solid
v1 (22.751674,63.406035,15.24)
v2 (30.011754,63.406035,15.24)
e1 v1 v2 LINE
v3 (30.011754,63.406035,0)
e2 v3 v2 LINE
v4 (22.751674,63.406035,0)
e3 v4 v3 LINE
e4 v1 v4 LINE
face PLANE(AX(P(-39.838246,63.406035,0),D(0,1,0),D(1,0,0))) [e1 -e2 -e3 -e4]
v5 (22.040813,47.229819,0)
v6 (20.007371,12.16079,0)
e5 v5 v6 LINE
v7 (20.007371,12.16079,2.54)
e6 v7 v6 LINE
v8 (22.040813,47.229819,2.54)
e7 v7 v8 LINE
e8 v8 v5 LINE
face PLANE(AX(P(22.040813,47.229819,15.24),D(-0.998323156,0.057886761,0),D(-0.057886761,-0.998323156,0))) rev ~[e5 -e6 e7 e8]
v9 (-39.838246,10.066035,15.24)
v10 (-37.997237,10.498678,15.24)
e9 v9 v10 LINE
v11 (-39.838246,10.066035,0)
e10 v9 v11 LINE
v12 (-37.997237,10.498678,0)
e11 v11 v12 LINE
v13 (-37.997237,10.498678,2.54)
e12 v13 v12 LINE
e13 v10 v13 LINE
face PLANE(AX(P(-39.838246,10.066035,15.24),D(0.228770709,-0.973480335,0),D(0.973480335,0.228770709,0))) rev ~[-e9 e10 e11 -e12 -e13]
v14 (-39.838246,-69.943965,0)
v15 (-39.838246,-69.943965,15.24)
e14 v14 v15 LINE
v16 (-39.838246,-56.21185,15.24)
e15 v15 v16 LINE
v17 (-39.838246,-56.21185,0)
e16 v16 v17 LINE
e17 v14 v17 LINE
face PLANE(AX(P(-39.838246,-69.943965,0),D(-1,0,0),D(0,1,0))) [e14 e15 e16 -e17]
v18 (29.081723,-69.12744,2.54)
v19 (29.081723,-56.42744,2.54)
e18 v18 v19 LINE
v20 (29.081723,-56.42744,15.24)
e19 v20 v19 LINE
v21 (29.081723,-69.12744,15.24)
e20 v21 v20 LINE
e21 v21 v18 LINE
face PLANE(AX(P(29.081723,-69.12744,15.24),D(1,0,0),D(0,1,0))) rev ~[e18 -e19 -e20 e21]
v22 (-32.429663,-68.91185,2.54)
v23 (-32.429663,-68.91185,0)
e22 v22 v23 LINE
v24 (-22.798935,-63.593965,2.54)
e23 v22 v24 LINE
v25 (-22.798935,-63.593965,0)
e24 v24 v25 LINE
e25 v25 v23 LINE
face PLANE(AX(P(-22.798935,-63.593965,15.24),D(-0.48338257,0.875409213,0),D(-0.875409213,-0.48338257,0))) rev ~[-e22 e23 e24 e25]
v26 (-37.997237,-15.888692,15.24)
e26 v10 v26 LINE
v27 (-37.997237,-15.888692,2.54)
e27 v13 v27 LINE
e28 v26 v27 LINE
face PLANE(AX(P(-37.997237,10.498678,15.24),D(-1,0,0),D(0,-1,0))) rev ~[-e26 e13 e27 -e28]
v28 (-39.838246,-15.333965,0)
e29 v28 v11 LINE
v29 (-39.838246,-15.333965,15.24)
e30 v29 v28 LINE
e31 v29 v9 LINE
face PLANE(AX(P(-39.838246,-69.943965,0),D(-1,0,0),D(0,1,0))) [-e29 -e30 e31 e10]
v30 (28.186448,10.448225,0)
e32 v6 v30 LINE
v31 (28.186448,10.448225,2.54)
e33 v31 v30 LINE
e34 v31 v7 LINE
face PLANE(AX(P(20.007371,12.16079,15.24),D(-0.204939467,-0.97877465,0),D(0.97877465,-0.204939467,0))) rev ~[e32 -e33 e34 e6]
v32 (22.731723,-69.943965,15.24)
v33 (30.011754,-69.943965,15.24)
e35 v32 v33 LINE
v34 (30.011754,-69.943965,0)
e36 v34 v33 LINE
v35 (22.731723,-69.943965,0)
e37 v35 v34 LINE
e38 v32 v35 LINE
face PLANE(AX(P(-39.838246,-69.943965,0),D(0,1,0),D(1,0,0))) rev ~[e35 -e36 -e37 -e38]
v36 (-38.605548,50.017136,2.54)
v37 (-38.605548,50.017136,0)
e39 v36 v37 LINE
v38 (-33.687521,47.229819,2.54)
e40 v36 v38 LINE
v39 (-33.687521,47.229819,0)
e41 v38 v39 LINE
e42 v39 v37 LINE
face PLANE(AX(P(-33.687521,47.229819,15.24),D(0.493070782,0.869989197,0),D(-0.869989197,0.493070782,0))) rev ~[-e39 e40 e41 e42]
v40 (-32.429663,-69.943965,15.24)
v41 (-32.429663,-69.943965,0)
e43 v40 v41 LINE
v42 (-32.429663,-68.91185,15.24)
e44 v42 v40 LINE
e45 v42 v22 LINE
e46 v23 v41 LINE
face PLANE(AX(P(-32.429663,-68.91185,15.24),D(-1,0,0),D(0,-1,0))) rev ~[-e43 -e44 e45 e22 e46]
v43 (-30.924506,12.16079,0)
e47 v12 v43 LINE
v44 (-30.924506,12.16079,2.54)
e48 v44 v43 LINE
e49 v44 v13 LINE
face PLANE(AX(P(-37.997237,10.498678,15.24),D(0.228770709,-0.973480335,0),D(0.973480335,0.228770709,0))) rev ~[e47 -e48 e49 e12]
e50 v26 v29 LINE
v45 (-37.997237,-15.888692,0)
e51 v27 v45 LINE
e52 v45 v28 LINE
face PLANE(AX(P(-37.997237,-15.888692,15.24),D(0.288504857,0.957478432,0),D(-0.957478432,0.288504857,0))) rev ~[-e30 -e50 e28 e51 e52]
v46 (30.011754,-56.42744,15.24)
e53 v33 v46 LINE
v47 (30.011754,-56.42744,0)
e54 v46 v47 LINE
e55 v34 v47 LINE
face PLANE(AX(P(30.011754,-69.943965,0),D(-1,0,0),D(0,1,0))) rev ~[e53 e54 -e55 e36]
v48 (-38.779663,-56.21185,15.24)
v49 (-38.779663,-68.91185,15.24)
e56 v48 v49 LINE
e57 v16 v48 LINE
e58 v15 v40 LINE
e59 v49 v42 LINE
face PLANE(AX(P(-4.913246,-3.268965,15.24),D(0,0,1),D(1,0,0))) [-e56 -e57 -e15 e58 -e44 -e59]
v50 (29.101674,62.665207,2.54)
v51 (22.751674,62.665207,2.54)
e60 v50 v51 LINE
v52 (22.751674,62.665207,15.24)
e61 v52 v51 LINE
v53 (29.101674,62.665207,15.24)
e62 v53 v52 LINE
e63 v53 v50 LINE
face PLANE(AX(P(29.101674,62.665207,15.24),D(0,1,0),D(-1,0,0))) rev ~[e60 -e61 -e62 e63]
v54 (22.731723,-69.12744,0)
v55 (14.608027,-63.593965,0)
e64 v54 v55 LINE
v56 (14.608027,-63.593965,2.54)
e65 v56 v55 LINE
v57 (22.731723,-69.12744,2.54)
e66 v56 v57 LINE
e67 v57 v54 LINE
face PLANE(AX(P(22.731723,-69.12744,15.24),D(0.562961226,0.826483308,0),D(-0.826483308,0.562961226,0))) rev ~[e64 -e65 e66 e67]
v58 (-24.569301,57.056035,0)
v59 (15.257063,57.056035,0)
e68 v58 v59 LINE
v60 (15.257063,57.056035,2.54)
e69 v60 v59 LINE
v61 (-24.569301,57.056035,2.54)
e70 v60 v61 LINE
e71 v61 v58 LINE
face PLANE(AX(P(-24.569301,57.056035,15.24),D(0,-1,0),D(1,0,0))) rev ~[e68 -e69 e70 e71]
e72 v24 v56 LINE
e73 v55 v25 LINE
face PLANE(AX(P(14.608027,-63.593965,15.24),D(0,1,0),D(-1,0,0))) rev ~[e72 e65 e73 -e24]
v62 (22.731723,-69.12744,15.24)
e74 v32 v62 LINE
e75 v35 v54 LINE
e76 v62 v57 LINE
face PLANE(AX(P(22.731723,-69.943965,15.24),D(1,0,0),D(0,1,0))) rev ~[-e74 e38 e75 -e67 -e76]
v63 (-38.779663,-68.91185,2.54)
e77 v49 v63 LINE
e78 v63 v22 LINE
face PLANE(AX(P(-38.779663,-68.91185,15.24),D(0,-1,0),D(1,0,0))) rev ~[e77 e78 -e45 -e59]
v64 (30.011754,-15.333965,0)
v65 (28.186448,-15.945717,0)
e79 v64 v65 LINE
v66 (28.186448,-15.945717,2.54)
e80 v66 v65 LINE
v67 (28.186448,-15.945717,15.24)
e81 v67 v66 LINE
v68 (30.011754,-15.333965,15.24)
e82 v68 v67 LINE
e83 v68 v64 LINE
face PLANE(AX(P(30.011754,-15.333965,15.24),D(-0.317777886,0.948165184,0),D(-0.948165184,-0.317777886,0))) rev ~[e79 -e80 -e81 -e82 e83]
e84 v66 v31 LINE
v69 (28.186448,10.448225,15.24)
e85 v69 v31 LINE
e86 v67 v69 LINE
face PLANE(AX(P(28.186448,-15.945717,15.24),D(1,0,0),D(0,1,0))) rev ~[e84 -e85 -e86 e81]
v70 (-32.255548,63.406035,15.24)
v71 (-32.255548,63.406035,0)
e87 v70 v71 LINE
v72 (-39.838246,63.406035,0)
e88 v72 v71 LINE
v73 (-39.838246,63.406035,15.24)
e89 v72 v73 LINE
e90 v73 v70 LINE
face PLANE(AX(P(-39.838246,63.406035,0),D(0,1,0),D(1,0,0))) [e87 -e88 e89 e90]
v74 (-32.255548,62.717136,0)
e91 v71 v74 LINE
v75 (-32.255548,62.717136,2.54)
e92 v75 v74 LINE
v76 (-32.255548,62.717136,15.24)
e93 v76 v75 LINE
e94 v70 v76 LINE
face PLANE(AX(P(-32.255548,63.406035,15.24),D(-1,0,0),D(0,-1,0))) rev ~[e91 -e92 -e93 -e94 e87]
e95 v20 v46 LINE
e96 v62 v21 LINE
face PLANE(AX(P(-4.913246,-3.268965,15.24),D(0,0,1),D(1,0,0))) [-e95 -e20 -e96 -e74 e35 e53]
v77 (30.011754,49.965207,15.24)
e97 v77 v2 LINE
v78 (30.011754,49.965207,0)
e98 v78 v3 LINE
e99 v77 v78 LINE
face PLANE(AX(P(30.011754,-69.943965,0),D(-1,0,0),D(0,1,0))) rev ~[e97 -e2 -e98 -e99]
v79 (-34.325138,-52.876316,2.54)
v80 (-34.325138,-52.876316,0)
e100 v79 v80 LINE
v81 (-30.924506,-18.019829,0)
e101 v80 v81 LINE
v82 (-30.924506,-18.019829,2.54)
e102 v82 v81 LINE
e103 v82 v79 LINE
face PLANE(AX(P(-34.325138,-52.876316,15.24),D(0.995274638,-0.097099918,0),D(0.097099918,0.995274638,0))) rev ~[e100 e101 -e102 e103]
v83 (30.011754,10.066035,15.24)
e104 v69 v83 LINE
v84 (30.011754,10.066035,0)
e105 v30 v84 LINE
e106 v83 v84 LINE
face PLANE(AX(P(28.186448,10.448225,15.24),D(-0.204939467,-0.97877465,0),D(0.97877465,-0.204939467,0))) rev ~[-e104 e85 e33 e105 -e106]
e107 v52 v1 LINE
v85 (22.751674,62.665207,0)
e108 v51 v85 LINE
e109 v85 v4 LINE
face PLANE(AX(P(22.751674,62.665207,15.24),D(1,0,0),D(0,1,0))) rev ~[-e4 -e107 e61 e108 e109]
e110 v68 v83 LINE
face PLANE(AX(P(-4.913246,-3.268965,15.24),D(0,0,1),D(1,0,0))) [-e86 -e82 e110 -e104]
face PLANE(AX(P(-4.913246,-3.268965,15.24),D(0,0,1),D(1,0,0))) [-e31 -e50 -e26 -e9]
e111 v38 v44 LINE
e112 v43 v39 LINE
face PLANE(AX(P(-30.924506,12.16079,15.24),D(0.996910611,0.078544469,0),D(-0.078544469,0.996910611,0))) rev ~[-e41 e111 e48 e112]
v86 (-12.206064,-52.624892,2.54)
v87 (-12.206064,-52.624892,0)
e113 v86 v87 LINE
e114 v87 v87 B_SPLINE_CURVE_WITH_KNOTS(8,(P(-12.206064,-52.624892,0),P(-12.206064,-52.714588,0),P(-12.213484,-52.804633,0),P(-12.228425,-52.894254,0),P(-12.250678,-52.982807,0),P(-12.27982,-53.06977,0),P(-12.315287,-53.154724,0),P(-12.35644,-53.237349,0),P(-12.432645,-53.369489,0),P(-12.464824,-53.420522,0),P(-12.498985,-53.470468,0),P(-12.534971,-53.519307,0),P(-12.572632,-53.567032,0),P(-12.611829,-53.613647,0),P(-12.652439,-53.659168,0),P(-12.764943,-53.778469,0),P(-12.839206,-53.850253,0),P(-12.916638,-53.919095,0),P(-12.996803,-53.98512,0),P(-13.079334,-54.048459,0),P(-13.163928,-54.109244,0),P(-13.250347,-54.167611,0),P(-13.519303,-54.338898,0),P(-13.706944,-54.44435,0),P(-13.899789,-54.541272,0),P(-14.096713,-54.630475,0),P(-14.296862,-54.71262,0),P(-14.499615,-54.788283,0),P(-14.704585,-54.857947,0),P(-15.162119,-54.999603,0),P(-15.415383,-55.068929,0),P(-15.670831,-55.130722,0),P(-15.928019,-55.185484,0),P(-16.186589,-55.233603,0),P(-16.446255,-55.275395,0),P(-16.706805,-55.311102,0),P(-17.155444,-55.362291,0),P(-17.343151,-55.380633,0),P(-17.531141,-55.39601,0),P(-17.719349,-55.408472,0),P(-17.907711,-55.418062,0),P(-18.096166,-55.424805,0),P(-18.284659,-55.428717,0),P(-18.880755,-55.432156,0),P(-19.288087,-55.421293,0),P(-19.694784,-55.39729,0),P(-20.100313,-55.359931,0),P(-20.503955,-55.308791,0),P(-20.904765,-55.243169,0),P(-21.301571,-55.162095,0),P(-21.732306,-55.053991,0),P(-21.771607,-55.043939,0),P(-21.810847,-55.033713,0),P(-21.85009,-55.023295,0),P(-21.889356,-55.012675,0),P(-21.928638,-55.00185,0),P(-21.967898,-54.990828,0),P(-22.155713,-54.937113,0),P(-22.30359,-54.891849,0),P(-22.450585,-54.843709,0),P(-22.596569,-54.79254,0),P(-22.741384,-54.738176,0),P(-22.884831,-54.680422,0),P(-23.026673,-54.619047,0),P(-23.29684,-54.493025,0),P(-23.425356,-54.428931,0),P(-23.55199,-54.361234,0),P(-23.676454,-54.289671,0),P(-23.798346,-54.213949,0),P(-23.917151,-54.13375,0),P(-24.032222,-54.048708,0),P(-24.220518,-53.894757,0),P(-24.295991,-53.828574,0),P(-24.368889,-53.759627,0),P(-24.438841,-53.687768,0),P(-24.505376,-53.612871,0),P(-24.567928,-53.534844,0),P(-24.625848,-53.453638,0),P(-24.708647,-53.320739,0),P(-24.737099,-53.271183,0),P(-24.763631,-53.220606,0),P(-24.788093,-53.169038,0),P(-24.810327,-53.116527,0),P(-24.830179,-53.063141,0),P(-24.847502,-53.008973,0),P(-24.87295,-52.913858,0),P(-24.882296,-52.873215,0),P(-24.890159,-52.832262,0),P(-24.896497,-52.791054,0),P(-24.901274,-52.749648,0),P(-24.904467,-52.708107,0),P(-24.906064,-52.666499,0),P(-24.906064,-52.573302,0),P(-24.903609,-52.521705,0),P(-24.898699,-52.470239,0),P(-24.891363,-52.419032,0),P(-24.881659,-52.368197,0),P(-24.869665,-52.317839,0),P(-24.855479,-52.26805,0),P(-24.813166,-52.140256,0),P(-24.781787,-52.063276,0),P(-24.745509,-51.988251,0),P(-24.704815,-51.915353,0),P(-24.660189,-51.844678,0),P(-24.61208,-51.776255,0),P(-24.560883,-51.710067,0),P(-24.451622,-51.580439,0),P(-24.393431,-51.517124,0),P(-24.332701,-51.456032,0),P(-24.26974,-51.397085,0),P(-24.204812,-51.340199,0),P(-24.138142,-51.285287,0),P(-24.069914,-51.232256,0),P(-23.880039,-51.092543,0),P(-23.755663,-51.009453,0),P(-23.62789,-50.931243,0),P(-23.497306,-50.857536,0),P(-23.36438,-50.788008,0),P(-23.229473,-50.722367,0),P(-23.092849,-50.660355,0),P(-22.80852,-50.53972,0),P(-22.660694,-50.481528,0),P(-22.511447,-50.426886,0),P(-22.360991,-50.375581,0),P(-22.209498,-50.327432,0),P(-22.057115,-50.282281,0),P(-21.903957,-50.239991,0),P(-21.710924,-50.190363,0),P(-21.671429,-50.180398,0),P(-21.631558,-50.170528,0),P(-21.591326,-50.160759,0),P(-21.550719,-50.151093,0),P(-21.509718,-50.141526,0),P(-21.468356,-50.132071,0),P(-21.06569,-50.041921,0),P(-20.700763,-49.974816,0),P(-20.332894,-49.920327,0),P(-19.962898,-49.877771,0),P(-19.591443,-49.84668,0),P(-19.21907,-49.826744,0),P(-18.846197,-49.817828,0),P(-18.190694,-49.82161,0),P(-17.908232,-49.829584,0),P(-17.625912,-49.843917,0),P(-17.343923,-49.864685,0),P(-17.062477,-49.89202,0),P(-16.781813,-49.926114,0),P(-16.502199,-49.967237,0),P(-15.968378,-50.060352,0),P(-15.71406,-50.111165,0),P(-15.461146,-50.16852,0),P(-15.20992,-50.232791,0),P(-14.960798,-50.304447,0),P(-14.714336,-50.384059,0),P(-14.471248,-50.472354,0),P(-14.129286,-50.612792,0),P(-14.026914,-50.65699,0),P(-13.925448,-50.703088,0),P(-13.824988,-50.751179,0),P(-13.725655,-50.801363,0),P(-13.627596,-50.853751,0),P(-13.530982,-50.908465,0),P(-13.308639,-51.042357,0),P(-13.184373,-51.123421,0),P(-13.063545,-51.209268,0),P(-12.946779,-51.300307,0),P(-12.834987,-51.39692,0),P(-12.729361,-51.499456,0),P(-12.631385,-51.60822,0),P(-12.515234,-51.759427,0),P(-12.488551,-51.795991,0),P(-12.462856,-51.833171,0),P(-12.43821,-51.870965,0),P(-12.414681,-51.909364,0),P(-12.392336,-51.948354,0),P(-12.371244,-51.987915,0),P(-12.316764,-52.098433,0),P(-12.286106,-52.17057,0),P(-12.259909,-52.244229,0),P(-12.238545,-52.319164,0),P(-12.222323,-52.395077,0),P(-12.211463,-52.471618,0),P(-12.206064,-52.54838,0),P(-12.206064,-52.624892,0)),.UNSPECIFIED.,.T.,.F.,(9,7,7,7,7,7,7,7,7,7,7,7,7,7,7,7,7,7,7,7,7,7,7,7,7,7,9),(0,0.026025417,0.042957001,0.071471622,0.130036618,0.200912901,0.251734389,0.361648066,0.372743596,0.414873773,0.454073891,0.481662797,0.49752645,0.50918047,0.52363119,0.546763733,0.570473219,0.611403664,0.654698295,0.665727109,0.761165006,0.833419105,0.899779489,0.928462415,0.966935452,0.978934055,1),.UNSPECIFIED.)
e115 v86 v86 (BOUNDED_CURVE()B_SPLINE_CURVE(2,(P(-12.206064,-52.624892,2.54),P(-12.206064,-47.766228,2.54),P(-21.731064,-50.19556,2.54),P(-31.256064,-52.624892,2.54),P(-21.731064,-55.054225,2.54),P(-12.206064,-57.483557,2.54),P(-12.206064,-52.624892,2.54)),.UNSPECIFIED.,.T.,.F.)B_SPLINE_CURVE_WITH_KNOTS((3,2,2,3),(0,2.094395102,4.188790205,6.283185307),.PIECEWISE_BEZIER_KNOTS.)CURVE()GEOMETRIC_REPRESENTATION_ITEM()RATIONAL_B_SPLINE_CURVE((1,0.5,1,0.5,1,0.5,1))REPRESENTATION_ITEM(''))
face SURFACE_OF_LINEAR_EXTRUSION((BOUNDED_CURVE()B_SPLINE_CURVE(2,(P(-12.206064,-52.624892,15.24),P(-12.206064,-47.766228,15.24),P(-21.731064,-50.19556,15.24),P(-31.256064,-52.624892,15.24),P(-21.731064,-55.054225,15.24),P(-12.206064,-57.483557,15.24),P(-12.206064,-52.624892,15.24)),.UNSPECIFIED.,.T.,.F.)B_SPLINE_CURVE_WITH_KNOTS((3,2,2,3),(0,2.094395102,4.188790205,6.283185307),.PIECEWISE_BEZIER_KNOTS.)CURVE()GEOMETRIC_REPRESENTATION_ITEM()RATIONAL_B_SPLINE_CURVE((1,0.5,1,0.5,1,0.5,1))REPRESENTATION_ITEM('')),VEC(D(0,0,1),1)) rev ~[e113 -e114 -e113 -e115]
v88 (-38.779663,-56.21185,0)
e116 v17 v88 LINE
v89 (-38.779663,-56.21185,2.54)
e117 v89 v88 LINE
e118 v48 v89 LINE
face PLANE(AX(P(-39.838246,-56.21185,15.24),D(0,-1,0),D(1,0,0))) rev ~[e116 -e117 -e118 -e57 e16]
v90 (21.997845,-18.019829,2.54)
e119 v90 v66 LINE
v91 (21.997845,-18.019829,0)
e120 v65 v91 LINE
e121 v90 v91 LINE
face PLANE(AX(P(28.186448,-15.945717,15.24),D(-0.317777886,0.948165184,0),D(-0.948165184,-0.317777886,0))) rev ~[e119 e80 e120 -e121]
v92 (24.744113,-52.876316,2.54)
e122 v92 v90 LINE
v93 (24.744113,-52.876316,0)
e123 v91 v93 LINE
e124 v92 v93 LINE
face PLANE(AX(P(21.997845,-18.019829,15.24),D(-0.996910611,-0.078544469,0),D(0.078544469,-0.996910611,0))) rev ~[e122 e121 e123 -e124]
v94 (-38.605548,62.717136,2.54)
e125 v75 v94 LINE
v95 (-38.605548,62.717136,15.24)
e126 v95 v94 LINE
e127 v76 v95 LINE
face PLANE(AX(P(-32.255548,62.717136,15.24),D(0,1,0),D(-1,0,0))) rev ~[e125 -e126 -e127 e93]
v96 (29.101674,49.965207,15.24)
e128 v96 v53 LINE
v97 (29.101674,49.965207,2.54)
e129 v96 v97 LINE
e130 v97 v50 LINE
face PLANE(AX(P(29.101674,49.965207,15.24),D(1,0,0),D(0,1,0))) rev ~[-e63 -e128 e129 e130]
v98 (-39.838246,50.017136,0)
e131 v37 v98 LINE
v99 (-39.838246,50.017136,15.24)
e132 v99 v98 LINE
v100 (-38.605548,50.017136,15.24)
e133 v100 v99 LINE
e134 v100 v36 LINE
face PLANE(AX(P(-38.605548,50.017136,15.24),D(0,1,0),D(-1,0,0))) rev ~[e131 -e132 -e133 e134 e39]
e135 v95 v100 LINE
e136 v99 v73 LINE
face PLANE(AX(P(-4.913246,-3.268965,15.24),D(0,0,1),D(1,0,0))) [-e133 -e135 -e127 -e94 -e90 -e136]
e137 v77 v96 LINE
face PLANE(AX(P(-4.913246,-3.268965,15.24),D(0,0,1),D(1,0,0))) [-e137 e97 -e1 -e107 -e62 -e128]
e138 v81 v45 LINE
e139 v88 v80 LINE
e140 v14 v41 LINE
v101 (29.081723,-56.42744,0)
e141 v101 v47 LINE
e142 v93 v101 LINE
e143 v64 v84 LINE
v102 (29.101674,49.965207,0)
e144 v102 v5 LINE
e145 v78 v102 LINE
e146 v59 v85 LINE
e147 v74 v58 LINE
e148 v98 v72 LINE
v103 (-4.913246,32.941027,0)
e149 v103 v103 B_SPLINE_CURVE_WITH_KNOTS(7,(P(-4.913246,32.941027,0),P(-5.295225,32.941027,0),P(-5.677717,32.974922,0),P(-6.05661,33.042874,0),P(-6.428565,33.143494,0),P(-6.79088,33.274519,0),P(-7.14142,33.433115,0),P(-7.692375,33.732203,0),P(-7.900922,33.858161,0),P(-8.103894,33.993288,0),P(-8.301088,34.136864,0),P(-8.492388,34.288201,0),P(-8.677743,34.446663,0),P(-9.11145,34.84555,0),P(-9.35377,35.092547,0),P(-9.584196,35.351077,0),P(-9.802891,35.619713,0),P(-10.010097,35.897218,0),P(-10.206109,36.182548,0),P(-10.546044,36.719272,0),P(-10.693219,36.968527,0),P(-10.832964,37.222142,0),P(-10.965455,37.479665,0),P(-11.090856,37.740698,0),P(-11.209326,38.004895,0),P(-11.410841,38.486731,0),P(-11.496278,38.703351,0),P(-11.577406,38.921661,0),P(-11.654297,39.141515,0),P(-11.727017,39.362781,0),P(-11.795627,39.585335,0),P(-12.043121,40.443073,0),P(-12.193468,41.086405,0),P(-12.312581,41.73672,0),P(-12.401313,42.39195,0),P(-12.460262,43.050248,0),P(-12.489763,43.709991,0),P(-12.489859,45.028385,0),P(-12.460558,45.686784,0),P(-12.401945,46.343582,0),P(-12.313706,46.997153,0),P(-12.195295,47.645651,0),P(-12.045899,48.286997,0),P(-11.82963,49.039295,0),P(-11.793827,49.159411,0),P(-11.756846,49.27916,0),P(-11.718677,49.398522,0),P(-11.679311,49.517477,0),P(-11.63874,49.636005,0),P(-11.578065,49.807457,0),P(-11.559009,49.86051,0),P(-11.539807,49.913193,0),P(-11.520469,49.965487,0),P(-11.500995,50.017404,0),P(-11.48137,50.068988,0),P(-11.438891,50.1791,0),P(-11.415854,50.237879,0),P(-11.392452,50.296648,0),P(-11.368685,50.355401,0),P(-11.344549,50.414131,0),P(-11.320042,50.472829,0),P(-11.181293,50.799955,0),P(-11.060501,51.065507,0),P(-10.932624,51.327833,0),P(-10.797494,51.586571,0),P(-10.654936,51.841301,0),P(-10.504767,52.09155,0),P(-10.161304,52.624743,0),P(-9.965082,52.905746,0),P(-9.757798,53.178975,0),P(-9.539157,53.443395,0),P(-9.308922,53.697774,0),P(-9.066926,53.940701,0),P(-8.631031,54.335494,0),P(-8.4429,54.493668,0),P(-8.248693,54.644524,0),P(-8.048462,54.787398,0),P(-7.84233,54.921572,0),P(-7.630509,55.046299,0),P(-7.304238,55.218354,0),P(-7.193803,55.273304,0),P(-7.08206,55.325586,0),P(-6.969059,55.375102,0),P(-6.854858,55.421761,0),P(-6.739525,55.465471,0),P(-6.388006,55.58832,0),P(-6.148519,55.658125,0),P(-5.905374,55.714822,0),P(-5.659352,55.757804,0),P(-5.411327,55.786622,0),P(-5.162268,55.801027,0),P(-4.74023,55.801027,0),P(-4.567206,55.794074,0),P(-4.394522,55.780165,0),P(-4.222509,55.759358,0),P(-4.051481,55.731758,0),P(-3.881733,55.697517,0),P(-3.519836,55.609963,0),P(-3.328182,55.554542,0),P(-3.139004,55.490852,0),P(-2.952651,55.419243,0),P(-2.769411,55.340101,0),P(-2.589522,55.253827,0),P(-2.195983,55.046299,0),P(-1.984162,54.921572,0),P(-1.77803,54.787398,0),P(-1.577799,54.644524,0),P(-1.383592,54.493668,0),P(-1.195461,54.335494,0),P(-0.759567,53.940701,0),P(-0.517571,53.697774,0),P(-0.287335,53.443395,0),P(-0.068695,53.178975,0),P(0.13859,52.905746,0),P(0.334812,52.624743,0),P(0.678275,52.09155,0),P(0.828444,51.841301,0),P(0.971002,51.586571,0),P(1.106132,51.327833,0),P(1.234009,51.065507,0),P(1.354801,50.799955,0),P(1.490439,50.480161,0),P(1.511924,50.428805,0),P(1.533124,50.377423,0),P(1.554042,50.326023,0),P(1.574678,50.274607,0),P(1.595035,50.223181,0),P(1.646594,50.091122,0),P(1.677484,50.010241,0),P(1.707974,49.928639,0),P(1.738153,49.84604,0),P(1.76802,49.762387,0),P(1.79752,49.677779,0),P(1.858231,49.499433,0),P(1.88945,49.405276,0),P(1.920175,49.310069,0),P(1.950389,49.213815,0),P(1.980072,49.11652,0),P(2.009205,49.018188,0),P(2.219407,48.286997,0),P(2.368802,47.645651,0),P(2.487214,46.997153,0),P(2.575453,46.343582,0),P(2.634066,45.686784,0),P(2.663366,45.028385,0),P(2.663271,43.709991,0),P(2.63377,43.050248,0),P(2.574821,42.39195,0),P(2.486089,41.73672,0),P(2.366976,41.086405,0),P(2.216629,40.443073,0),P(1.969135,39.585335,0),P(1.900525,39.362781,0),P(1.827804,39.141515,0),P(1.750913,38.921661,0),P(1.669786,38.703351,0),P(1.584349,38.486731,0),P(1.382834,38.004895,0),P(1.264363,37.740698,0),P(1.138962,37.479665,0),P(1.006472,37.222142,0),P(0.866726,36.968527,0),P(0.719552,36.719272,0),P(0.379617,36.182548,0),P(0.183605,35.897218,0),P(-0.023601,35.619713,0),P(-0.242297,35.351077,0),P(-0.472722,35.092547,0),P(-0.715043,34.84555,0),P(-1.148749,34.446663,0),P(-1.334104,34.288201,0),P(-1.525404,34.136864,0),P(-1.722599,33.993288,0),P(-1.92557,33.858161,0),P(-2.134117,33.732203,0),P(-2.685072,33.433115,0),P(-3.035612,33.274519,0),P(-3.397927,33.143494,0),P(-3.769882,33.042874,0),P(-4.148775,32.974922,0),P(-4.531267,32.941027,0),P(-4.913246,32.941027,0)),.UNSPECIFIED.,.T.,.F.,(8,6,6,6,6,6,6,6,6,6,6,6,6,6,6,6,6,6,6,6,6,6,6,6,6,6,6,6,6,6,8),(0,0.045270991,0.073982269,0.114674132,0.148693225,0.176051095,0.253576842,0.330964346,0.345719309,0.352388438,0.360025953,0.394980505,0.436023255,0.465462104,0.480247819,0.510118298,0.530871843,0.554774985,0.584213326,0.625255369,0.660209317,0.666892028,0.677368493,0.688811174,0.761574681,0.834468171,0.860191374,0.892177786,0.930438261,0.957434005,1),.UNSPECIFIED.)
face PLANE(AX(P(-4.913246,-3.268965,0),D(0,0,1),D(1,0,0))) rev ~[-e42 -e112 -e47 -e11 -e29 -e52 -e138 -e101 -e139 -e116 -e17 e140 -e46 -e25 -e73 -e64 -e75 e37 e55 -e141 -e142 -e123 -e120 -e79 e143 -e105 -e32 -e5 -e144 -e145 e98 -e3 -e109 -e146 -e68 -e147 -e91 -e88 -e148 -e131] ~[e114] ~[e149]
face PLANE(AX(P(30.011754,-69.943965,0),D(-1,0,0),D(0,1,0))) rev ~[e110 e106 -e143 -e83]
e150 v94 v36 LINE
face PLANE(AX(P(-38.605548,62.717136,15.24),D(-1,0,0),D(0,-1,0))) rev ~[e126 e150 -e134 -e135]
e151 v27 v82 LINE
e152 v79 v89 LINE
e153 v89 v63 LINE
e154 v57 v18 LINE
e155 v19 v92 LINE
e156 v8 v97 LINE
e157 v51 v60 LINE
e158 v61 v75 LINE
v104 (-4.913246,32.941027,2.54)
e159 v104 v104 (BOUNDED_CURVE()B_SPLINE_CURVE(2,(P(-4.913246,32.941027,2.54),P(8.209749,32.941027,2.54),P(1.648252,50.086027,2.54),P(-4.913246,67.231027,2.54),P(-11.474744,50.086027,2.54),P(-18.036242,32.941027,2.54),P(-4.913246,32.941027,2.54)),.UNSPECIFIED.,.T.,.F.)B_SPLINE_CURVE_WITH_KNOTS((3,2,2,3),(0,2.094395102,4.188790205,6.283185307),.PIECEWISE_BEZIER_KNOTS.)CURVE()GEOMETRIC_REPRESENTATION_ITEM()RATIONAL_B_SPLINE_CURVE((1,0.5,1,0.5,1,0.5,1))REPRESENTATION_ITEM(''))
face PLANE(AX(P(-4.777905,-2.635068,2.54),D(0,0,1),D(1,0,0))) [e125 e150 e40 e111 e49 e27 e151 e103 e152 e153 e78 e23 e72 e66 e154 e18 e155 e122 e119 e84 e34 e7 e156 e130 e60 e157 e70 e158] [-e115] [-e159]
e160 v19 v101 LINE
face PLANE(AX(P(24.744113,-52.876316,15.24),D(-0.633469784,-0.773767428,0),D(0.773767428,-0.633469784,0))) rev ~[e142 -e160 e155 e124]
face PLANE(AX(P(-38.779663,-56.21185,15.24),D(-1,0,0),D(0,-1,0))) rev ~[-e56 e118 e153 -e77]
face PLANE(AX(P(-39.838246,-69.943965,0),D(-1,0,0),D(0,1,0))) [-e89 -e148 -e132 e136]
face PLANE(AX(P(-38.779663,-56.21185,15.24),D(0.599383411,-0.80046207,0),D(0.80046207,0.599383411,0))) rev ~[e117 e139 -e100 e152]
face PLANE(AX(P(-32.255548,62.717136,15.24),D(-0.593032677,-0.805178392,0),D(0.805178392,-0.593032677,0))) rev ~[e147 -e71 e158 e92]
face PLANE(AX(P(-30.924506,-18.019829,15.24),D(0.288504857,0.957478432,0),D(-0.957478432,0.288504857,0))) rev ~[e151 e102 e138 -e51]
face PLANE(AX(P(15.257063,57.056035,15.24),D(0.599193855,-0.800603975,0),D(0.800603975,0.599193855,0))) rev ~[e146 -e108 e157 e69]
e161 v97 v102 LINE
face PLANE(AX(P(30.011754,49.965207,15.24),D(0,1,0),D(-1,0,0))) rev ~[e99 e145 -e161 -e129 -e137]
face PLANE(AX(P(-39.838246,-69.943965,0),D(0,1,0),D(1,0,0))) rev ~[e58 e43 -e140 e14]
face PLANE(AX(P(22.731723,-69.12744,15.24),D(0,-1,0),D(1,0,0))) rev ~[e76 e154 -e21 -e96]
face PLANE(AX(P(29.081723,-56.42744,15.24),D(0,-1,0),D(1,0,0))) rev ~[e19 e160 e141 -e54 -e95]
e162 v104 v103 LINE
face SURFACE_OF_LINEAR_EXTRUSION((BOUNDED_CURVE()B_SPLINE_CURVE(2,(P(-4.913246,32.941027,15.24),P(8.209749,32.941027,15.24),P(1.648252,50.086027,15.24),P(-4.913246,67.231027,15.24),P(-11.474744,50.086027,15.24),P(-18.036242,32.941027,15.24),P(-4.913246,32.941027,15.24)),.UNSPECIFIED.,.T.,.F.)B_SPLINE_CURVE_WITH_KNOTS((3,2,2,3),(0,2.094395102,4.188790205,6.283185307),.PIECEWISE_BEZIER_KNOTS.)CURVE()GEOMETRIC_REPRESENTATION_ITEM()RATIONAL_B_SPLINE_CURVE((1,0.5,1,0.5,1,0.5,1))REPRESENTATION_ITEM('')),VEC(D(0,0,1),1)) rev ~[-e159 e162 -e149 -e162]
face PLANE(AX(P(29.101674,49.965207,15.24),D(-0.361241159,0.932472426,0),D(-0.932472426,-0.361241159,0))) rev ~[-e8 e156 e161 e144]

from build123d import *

# Parameters (mm, degrees)
F0_W     = 69.85
F0_H     = 133.35
F1_DEPTH = 15.24
F3_DEPTH = 15.241
F4_DEPTH = 15.241
F5_DEPTH = 12.7
F6_DEPTH = 15.2410001


# Not quite as in the source:
# - a feature names something its author has since deleted; it is built from what else it names


with BuildPart() as f1:
    # F0 (on Top) → F1 (new body)
    with BuildSketch(Plane.XY):
        with Locations((-4.9132461604, -3.2689645886)):
            Rectangle(F0_W, F0_H)
    extrude(amount=F1_DEPTH)

    # F2 (on face) → F3 (cut, through all)
    with BuildSketch(Plane.XY.offset(15.24)):
        Polygon((-4.9132461604, 63.4060354114), (-32.2555484414, 63.4060354114), (-32.2555484414, 62.717136082), (-24.5693009347, 57.0560354114), (-4.9132461604, 57.0560354114), align=None)
        Polygon((-38.6055484414, 50.017136082), (-39.8382461604, 50.017136082), (-39.8382461604, 10.0660354114), (-37.9972373044, 10.4986778455), (-30.9245064855, 12.1607901528), (-33.6875207722, 47.2298189998), align=None)
        Polygon((22.7516740561, 63.4060354114), (-4.9132461604, 63.4060354114), (-4.9132461604, 57.0560354114), (15.2570633218, 57.0560354114), (22.7516740561, 62.6652065337), align=None)
        Polygon((-37.9972373044, -15.8886924859), (-39.8382461604, -15.3339645886), (-39.8382461604, -55.9739645886), (-39.8382461604, -56.2118504524), (-38.7796634255, -56.2118504524), (-34.3251377344, -52.876316011), (-30.9245064855, -18.0198289454), align=None)
        Polygon((30.0117538396, 49.9652065337), (29.1016740561, 49.9652065337), (22.0408134996, 47.2298189998), (20.0073712407, 12.1607901528), (28.1864475644, 10.4482248105), (30.0117538396, 10.0660354114), align=None)
        Polygon((-32.4296634255, -68.9118504524), (-32.4296634255, -69.9439645886), (-6.858468987, -69.9439645886), (-6.858468987, -63.5939645886), (-22.7989349514, -63.5939645886), align=None)
        Polygon((30.0117538396, -55.9739645886), (30.0117538396, -15.3339645886), (28.1864475644, -15.9457166114), (21.9978448004, -18.0198289454), (24.7441133717, -52.876316011), (29.0817226684, -56.4274404526), (30.0117538396, -56.4274404526), align=None)
        Polygon((-6.858468987, -63.5939645886), (-6.858468987, -69.9439645886), (22.7317226684, -69.9439645886), (22.7317226684, -69.1274404526), (14.6080274135, -63.5939645886), align=None)
    extrude(amount=-F3_DEPTH, mode=Mode.SUBTRACT)

    # F2 (on face) → F4 (cut, through all)
    with BuildSketch(Plane.XY.offset(15.24)):
        with BuildLine():
            add(Edge.make_bspline(
                [(-4.9132461604, 32.9410274994), (8.2097492076, 32.9410274994), (1.6482515236, 50.0860274994), (-4.9132461604, 67.2310274994), (-11.4747438444, 50.0860274994), (-18.0362415283, 32.9410274994), (-4.9132461604, 32.9410274994)],
                knots=[0, 0, 0, 2.0943951024, 2.0943951024, 4.1887902048, 4.1887902048, 6.2831853072, 6.2831853072, 6.2831853072], degree=2, weights=[1, 0.5, 1, 0.5, 1, 0.5, 1]))
        make_face()
    extrude(amount=-F4_DEPTH, mode=Mode.SUBTRACT)

    # F2 (on face) → F5 (cut)
    with BuildSketch(Plane.XY.offset(15.24)):
        Polygon((-24.5693009347, 57.0560354114), (-32.2555484414, 62.717136082), (-38.6055484414, 62.717136082), (-38.6055484414, 50.017136082), (-33.6875207722, 47.2298189998), (-30.9245064855, 12.1607901528), (-37.9972373044, 10.4986778455), (-37.9972373044, -15.8886924859), (-30.9245064855, -18.0198289454), (-34.3251377344, -52.876316011), (-38.7796634255, -56.2118504524), (-38.7796634255, -68.9118504524), (-32.4296634255, -68.9118504524), (-22.7989349514, -63.5939645886), (-6.858468987, -63.5939645886), (14.6080274135, -63.5939645886), (22.7317226684, -69.1274404526), (29.0817226684, -69.1274404526), (29.0817226684, -56.4274404526), (24.7441133717, -52.876316011), (21.9978448004, -18.0198289454), (28.1864475644, -15.9457166114), (28.1864475644, 10.4482248105), (20.0073712407, 12.1607901528), (22.0408134996, 47.2298189998), (29.1016740561, 49.9652065337), (29.1016740561, 62.6652065337), (22.7516740561, 62.6652065337), (15.2570633218, 57.0560354114), (-4.9132461604, 57.0560354114), align=None)
        with BuildLine():
            add(Edge.make_bspline(
                [(-12.2060639948, -52.6248924434), (-12.2060639948, -47.7662279623), (-21.7310639948, -50.1955602028), (-31.2560639948, -52.6248924434), (-21.7310639948, -55.054224684), (-12.2060639948, -57.4835569246), (-12.2060639948, -52.6248924434)],
                knots=[0, 0, 0, 2.0943951024, 2.0943951024, 4.1887902048, 4.1887902048, 6.2831853072, 6.2831853072, 6.2831853072], degree=2, weights=[1, 0.5, 1, 0.5, 1, 0.5, 1]))
        make_face(mode=Mode.SUBTRACT)
        with BuildLine():
            add(Edge.make_bspline(
                [(-4.9132461604, 32.9410274994), (8.2097492076, 32.9410274994), (1.6482515236, 50.0860274994), (-4.9132461604, 67.2310274994), (-11.4747438444, 50.0860274994), (-18.0362415283, 32.9410274994), (-4.9132461604, 32.9410274994)],
                knots=[0, 0, 0, 2.0943951024, 2.0943951024, 4.1887902048, 4.1887902048, 6.2831853072, 6.2831853072, 6.2831853072], degree=2, weights=[1, 0.5, 1, 0.5, 1, 0.5, 1]))
        make_face(mode=Mode.SUBTRACT)
    extrude(amount=-F5_DEPTH, mode=Mode.SUBTRACT)

    # F6 (cut, through all): a face of the model
    f6_faces = [f1.faces().sort_by_distance(p)[0] for p in [
        (-18.5223410281, -52.6248924434, 15.24),
    ]]
    extrude(f6_faces, amount=-F6_DEPTH, mode=Mode.SUBTRACT)


solid = f1.part
